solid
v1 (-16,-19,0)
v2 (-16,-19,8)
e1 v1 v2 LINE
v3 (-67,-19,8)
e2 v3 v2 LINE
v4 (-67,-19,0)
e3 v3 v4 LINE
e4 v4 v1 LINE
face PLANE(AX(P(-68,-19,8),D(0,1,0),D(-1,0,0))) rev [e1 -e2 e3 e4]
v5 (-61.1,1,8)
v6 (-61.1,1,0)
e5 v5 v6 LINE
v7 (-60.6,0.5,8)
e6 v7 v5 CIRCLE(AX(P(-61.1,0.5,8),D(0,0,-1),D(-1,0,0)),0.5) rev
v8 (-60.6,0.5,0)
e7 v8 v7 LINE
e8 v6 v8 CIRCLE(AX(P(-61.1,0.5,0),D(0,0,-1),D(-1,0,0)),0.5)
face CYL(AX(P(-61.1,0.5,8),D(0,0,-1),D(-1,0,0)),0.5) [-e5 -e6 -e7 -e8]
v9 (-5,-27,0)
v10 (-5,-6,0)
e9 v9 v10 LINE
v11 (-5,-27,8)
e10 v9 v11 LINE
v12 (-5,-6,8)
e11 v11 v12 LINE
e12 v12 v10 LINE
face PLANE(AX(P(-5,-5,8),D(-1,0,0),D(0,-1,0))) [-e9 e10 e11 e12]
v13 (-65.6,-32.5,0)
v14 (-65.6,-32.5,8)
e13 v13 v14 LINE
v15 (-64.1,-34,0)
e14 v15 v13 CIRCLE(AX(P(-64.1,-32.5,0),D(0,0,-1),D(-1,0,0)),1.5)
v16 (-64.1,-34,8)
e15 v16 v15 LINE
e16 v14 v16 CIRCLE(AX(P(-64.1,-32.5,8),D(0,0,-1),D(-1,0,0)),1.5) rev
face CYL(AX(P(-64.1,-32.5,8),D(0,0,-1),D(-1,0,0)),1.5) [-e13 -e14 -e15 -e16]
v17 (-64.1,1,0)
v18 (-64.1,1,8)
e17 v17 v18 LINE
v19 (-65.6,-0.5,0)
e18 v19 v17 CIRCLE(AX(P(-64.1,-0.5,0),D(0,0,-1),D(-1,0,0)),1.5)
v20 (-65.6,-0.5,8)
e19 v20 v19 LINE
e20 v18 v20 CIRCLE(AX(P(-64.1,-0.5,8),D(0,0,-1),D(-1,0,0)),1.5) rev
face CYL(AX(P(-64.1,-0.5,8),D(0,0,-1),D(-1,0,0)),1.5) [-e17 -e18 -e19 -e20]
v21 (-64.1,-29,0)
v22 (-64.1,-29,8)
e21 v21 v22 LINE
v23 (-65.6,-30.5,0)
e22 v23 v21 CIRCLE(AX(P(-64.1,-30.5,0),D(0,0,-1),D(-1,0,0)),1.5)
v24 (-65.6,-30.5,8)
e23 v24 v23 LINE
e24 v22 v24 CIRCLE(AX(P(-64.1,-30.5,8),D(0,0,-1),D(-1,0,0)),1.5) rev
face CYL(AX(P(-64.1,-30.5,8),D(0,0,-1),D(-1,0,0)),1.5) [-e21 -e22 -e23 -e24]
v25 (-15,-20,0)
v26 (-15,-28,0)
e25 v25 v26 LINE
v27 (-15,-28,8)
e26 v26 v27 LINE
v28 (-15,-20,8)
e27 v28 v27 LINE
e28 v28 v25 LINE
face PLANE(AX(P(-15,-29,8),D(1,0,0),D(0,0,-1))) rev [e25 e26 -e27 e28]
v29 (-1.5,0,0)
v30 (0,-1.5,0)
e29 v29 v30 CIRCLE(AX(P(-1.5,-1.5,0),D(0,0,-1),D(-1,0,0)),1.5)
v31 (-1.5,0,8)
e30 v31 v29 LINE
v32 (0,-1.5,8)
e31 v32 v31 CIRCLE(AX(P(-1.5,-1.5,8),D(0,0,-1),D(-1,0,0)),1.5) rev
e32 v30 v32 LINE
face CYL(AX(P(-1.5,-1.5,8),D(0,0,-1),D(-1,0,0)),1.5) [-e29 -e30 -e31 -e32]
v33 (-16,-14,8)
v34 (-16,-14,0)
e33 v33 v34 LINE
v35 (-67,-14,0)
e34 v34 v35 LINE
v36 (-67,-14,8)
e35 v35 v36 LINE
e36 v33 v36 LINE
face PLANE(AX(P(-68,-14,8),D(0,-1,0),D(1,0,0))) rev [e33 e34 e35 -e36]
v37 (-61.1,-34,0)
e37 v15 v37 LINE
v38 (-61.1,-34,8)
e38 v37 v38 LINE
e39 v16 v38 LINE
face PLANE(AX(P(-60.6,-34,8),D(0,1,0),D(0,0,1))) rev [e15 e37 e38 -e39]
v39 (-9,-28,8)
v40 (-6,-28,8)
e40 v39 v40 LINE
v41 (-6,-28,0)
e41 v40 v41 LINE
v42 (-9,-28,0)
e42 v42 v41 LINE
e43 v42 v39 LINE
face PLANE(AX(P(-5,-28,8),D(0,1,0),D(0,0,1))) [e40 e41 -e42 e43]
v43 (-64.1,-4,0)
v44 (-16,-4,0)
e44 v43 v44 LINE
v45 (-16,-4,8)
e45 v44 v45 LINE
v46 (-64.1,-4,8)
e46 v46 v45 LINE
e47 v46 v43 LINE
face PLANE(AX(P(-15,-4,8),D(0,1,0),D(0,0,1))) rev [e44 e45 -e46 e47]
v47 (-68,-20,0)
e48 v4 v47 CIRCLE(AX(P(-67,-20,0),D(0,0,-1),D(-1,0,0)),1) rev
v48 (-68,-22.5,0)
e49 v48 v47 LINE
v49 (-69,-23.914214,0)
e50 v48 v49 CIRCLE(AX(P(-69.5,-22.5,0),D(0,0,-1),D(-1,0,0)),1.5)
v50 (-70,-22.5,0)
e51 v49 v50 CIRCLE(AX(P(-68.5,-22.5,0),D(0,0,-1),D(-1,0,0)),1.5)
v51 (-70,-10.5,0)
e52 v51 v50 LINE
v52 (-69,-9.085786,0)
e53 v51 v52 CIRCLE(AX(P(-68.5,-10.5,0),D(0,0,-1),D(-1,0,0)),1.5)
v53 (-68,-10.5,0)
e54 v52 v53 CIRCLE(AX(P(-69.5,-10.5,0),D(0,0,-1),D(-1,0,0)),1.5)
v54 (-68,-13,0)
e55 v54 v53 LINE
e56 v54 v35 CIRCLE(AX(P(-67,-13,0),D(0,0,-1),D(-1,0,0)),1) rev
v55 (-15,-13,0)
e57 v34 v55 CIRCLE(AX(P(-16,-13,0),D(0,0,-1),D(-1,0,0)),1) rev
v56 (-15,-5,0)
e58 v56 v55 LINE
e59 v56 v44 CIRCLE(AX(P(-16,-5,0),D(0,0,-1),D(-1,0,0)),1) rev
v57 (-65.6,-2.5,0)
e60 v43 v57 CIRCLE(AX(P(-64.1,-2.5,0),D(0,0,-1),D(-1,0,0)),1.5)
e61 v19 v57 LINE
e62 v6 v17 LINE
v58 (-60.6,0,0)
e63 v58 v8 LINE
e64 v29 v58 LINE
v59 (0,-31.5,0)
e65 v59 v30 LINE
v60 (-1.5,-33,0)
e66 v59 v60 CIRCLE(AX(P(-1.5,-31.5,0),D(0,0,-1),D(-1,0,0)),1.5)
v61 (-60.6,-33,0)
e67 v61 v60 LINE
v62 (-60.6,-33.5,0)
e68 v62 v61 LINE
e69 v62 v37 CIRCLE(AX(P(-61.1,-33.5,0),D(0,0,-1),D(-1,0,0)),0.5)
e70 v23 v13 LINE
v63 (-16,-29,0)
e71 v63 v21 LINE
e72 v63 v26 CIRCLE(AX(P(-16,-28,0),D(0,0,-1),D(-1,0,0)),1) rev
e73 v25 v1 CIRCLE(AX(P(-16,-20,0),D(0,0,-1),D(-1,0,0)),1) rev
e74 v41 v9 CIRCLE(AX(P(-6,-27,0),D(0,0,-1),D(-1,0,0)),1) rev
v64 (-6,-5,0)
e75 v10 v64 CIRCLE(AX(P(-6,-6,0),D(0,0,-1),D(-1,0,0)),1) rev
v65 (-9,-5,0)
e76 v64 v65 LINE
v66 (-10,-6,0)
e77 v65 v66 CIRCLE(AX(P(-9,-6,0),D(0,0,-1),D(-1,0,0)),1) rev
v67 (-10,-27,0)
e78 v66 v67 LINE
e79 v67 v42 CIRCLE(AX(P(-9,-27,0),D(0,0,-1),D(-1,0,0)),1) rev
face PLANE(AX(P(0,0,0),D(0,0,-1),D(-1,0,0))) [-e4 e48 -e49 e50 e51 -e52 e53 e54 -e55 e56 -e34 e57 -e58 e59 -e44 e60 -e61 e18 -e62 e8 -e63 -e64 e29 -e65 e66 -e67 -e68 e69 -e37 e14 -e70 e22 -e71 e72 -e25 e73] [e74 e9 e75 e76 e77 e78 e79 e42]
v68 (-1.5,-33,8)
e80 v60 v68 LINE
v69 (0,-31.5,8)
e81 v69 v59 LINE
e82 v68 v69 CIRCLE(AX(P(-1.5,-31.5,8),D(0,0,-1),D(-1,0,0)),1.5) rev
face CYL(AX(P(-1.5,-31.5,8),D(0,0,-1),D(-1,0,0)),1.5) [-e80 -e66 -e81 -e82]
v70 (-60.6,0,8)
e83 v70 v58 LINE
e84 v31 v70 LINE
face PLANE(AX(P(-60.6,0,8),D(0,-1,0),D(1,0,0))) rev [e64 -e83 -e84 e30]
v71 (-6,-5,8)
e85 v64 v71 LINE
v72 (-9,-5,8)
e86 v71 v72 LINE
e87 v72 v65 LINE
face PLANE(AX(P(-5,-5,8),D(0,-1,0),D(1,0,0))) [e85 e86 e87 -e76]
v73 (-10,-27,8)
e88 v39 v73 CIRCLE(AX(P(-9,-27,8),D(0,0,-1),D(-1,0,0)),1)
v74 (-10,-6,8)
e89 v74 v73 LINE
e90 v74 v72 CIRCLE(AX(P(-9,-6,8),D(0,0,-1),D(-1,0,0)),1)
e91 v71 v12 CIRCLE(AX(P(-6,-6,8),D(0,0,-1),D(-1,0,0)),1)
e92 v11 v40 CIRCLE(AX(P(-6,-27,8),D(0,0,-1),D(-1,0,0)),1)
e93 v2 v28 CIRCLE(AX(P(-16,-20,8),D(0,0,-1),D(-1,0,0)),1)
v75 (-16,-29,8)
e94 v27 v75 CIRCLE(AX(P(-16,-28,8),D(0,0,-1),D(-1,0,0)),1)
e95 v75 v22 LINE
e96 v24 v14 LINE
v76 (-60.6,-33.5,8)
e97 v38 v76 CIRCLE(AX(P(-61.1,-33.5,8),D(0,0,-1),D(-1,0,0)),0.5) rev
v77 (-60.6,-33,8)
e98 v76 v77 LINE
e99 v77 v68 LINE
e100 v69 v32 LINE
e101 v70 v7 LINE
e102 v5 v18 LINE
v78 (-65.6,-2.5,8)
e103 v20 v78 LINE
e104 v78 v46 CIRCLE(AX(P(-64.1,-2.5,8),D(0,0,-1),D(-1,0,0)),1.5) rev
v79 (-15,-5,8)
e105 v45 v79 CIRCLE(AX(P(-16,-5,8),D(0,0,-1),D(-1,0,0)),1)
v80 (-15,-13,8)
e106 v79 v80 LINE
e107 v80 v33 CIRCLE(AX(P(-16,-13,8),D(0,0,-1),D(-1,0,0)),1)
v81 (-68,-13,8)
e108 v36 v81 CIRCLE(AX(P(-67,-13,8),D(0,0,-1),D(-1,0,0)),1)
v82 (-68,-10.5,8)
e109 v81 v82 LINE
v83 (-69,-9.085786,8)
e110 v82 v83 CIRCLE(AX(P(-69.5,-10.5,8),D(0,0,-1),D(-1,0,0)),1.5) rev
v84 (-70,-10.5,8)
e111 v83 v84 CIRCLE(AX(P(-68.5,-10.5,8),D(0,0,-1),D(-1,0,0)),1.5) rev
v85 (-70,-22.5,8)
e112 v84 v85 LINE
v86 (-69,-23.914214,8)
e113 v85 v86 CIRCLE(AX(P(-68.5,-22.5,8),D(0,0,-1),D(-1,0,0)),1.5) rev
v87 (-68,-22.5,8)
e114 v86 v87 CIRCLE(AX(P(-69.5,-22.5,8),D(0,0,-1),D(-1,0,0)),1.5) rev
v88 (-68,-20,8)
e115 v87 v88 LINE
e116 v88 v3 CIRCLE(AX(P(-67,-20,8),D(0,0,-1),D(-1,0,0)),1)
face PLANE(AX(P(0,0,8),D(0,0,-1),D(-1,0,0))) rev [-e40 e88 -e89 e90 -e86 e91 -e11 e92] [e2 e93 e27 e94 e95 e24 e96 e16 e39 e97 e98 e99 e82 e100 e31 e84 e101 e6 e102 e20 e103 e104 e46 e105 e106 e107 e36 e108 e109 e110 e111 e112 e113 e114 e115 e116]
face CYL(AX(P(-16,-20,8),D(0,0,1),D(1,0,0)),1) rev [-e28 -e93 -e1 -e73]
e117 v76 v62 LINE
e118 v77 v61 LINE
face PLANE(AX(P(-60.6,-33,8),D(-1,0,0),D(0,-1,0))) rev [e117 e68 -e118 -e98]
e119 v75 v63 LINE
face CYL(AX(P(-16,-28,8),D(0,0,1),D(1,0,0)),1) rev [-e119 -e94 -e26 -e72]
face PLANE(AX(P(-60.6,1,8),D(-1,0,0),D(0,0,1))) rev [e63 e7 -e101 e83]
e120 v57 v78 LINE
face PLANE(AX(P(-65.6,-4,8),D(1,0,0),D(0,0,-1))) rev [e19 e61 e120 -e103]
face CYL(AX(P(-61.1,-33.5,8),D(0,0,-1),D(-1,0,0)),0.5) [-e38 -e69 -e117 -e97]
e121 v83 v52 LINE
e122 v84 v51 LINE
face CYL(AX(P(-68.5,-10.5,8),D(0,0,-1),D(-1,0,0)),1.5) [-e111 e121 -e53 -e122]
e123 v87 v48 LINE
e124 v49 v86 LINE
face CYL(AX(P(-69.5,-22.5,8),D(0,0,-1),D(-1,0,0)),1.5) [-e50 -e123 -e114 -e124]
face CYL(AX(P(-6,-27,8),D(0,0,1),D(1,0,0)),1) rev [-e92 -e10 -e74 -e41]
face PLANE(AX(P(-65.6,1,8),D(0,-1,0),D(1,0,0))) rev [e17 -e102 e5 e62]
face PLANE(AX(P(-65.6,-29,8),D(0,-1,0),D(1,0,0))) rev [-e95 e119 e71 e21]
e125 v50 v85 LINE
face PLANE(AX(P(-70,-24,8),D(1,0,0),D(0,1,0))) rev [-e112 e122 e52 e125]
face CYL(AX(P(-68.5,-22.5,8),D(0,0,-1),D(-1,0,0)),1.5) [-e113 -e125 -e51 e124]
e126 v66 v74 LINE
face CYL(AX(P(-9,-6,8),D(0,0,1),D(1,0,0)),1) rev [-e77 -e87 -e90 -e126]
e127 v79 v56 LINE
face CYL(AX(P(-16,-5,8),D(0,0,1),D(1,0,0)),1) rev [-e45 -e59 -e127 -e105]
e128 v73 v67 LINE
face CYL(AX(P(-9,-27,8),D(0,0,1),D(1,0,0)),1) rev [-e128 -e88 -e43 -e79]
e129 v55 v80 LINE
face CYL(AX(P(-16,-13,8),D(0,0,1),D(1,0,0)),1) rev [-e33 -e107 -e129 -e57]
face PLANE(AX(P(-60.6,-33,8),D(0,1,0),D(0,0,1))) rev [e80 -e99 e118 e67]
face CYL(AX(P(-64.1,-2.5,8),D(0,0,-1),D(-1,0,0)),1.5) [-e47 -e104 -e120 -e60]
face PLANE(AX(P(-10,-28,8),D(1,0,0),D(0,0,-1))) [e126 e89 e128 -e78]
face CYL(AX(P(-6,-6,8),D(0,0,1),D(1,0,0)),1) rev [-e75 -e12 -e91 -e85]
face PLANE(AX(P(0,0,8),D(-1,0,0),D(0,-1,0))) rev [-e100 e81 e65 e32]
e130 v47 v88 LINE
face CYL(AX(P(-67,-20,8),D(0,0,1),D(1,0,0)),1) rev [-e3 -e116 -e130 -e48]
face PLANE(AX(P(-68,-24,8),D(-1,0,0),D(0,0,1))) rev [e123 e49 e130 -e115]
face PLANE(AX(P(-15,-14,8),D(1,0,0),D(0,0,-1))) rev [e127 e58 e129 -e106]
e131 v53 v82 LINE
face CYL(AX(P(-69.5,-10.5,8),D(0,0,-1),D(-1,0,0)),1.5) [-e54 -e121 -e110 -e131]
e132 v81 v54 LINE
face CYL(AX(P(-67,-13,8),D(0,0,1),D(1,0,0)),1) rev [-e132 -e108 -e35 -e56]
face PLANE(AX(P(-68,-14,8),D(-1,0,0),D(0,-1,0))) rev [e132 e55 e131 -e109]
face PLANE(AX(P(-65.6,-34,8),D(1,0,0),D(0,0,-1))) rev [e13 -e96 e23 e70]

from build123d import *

# Parameters (mm, degrees)
SKETCH1_W           = 23
SKETCH1_H           = 5
BOSS_EXTRUDE2_DEPTH = 8
FILLET1_R           = 1
FILLET2_R           = 0.5
FILLET3_R           = 1.5


with BuildPart() as part:
    # Sketch1 → Boss-Extrude2 (new body)
    with BuildSketch(Plane(origin=(0, 0, 0), x_dir=(0, 1, 0), z_dir=(0, 0, 1))):
        Polygon((0, 0), (-33, 0), (-33, 60.6), (-34, 60.6), (-34, 65.6), (-29, 65.6), (-29, 15), (-19, 15), (-19, 68), (-24, 68), (-24, 70), (-9, 70), (-9, 68), (-14, 68), (-14, 15), (-4, 15), (-4, 65.6), (1, 65.6), (1, 60.6), (0, 60.6), align=None)
        with Locations((-16.5, 7.5)):
            Rectangle(SKETCH1_W, SKETCH1_H, mode=Mode.SUBTRACT)
    extrude(amount=BOSS_EXTRUDE2_DEPTH)

    # Fillet1
    fillet1_edges = [part.edges().sort_by_distance(p)[0] for p in [
        (-15, -29, 4),
        (-15, -19, 4),
        (-68, -19, 4),
        (-68, -14, 4),
        (-15, -14, 4),
        (-15, -4, 4),
        (-10, -5, 4),
        (-10, -28, 4),
        (-5, -28, 4),
        (-5, -5, 4),
    ]]
    fillet(fillet1_edges, radius=FILLET1_R)

    # Fillet2
    fillet2_edges = [part.edges().sort_by_distance(p)[0] for p in [
        (-60.6, -34, 4),
        (-60.6, 1, 4),
    ]]
    fillet(fillet2_edges, radius=FILLET2_R)

    # Fillet3
    # the kernel refuses this fillet: 1.5 mm, written as the material it takes off along each edge
    with BuildSketch(Plane(origin=(-70, -24, -3.75), x_dir=(1, 0, 0), z_dir=(0, 0, 1)), Plane(origin=(-70, -9, -3.75), x_dir=(0, -1, 0), z_dir=(0, 0, 1)), Plane(origin=(-68, -9, -3.75), x_dir=(-1, 0, 0), z_dir=(0, 0, 1)), Plane(origin=(-68, -24, -3.75), x_dir=(0, 1, 0), z_dir=(0, 0, 1)), Plane(origin=(-65.6, -29, -3.75), x_dir=(0, -1, 0), z_dir=(0, 0, 1)), Plane(origin=(-65.6, -34, -3.75), x_dir=(1, 0, 0), z_dir=(0, 0, 1))) as fillet3_piece_1:
        with BuildLine():
            CenterArc((FILLET3_R, FILLET3_R), FILLET3_R, 180, 90)
            Line((0, FILLET3_R), (0, 0))
            Line((0, 0), (FILLET3_R, 0))
        make_face()
    extrude(amount=15.5, mode=Mode.SUBTRACT)
    with BuildSketch(Plane(origin=(0, -33, -3.75), x_dir=(-1, 0, 0), z_dir=(0, 0, 1)), Plane(origin=(0, 0, -3.75), x_dir=(0, -1, 0), z_dir=(0, 0, 1)), Plane(origin=(-65.6, 1, -3.75), x_dir=(1, 0, 0), z_dir=(0, 0, 1)), Plane(origin=(-65.6, -4, -3.75), x_dir=(0, 1, 0), z_dir=(0, 0, 1))) as fillet3_piece_2:
        with BuildLine():
            CenterArc((FILLET3_R, -FILLET3_R), FILLET3_R, 90, 90)
            Line((0, -FILLET3_R), (0, 0))
            Line((0, 0), (FILLET3_R, 0))
        make_face()
    extrude(amount=15.5, mode=Mode.SUBTRACT)


solid = part.part
